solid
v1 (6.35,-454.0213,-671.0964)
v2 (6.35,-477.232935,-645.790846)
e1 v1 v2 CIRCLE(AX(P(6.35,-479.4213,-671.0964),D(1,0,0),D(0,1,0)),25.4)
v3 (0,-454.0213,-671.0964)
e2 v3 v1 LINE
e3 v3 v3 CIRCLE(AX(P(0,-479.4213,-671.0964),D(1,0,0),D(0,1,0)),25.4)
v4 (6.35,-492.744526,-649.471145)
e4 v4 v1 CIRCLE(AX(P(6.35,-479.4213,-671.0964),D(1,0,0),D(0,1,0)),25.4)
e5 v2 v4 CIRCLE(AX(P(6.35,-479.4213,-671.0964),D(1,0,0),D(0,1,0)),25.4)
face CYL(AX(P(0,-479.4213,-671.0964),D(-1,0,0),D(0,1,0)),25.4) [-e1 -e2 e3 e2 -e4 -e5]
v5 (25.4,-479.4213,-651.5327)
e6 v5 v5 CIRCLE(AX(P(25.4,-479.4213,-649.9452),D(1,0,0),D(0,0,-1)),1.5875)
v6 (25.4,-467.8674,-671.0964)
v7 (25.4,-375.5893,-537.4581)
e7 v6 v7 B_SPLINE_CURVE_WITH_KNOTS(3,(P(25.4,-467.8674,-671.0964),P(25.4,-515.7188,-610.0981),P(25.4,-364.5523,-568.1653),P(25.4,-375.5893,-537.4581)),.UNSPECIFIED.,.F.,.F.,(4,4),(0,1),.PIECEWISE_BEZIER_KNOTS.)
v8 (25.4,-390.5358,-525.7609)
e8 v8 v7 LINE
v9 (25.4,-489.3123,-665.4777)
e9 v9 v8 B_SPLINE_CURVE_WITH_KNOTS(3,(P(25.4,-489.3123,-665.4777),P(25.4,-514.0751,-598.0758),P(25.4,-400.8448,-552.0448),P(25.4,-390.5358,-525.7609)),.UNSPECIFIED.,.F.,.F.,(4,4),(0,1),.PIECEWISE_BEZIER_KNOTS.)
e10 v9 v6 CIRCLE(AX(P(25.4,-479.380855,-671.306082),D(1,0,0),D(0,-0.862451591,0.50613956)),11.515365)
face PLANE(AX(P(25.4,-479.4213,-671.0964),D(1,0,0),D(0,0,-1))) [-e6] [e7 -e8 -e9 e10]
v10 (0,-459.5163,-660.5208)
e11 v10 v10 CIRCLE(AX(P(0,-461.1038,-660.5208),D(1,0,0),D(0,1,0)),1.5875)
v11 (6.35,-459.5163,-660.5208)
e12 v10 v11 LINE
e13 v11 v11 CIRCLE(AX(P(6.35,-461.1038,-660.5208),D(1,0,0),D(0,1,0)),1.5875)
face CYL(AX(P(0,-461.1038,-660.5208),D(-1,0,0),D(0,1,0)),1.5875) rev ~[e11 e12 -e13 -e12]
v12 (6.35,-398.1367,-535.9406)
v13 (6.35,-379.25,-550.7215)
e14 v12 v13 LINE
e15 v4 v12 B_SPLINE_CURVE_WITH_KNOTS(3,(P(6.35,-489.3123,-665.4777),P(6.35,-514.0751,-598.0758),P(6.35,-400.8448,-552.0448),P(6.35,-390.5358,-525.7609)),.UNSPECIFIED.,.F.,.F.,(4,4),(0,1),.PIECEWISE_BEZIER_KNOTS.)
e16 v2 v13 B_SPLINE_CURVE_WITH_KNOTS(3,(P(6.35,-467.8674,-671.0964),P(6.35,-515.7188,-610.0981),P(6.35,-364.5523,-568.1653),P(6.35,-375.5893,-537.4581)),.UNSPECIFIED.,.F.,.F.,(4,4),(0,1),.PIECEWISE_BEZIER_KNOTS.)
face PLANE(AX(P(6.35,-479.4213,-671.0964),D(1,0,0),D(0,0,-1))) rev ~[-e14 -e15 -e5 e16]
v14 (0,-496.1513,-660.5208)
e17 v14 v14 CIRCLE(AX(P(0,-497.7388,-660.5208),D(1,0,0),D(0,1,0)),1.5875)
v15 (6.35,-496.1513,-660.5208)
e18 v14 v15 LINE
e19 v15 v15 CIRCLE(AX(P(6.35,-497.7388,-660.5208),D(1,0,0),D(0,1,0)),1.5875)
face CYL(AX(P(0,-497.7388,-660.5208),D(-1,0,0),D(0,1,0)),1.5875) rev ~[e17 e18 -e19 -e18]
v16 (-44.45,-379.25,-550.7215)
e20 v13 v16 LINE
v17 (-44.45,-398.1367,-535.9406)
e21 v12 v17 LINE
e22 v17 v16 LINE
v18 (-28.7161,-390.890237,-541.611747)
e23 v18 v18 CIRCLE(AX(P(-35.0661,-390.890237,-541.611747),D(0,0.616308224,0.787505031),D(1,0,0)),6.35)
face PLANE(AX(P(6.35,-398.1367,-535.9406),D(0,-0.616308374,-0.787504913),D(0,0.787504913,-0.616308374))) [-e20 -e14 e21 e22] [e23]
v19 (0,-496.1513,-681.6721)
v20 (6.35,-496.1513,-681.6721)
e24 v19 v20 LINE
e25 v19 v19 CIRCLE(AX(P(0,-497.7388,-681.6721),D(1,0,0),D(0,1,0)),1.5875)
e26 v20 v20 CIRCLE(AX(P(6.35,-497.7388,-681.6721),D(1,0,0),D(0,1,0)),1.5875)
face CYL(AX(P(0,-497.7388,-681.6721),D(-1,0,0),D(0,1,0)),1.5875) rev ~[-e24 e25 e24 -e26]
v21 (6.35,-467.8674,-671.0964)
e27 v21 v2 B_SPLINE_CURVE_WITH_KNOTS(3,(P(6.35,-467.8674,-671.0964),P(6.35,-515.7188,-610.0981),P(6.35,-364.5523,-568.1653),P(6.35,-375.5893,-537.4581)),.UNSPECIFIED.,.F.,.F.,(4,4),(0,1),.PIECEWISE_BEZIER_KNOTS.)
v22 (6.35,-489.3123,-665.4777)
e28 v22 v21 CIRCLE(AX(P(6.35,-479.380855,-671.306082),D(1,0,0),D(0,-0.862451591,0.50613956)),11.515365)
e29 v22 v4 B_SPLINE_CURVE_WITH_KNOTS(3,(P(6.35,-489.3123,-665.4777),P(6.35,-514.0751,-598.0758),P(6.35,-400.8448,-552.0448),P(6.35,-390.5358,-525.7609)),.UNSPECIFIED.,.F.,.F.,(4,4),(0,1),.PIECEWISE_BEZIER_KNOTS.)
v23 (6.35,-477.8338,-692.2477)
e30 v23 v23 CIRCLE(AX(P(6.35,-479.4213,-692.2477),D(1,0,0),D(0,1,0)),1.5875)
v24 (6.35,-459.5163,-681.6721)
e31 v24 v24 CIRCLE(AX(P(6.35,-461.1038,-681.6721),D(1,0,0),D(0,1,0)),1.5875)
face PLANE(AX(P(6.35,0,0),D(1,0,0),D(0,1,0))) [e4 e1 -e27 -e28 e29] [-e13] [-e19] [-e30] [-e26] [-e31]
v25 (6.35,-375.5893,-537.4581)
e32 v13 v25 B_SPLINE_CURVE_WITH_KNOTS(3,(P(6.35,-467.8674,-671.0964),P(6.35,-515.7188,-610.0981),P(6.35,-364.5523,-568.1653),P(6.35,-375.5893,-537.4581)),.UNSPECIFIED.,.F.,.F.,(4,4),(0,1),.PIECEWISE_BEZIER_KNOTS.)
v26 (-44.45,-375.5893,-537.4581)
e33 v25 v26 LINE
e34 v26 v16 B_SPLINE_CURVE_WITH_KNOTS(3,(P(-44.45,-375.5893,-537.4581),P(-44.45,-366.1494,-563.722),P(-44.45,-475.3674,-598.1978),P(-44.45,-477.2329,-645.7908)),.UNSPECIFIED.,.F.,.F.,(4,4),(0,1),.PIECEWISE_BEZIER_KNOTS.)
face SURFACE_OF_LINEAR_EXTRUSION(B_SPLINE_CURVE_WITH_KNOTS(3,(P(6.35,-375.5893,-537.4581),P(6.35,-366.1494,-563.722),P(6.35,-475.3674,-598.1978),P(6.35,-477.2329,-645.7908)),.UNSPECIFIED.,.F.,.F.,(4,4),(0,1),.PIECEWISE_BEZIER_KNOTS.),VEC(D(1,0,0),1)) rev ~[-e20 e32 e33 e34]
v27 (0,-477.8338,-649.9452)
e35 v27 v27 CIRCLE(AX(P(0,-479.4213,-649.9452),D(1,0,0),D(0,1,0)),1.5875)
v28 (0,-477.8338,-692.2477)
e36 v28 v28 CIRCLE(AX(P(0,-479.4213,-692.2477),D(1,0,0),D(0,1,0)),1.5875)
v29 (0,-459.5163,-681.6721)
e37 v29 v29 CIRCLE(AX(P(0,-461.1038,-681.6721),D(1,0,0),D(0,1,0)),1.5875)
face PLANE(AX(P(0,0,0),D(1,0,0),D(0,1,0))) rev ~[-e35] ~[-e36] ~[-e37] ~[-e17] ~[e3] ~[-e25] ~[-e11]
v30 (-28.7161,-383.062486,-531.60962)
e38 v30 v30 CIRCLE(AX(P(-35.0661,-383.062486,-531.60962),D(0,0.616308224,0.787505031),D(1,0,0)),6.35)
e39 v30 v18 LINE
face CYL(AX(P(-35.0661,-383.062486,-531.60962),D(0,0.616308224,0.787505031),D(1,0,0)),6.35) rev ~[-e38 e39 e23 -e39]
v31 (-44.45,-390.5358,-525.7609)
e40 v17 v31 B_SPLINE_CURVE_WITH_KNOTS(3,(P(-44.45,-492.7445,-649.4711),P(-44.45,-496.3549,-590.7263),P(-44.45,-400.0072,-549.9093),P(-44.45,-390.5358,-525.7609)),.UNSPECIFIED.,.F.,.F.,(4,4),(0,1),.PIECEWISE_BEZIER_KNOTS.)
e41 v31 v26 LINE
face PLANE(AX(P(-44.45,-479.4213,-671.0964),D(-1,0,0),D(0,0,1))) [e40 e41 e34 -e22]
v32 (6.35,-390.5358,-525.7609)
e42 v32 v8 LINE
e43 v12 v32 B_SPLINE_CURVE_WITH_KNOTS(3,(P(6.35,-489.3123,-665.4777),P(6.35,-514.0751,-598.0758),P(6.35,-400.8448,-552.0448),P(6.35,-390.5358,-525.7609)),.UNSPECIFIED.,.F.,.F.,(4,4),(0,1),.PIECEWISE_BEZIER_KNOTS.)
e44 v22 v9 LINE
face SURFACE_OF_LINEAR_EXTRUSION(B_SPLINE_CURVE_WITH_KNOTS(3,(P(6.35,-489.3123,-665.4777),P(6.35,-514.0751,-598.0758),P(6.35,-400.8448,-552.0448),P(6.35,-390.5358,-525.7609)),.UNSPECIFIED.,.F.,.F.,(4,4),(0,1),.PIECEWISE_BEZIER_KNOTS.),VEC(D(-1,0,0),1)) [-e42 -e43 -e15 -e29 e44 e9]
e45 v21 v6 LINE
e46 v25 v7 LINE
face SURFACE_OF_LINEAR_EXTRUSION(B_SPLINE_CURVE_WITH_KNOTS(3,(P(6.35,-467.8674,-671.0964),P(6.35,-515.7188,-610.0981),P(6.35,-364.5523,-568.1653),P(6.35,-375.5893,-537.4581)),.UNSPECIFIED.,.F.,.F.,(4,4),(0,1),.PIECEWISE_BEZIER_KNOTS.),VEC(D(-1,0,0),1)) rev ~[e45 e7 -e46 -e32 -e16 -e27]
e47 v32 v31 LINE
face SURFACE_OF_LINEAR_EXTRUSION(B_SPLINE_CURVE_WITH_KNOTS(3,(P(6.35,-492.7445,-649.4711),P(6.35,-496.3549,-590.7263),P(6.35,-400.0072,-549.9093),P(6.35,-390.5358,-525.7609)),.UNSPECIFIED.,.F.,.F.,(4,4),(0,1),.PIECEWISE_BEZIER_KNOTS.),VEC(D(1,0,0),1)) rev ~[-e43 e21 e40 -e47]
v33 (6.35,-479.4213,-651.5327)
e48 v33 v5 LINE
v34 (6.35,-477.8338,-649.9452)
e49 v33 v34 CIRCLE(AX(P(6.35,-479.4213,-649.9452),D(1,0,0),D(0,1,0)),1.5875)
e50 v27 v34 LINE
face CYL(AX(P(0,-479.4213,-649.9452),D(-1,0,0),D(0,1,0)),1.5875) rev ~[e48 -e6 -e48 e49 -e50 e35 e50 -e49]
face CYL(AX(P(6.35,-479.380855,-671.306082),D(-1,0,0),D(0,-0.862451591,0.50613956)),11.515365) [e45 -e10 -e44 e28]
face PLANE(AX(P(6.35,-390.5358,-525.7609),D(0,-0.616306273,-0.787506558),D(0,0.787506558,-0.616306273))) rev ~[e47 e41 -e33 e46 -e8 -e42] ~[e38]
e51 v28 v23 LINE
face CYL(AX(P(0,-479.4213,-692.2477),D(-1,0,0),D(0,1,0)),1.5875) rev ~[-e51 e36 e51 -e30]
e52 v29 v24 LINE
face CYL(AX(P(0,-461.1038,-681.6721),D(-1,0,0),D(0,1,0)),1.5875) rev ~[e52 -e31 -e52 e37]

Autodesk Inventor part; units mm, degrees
ref_plane "YZ Plane" through (0, 0, 0) normal (1, 0, 0) x (0, 1, 0)
ref_plane "XZ Plane" through (0, 0, 0) normal (0, 1, 0) x (-1, 0, 0)
ref_plane "XY Plane" through (0, 0, 0) normal (0, 0, 1) x (1, 0, 0)
sketch "Sketch1" plane through (0, 0, 0) normal (1, 0, 0) x (0, 1, 0)
  circle A0 centre (-479.4213, -671.0964) radius 25.4
  circle A1 centre (-479.4213, -671.0964) radius 88.9 projected
  circle A2 centre (-479.4213, -649.9452) radius 1.5875
  circle A3 centre (-497.7388, -660.5208) radius 1.5875
  circle A4 centre (-497.7388, -681.6721) radius 1.5875
  circle A5 centre (-479.4213, -692.2477) radius 1.5875
  circle A6 centre (-461.1038, -681.6721) radius 1.5875
  circle A7 centre (-461.1038, -660.5208) radius 1.5875
  point P0 (0, 0)
  dimension "d0" = 50.8
  dimension "d1" = 3.175
  dimension "d4" = 360
extrude "Extrusion1" add sketch "Sketch1" along normal blind 6.35 contours A0
sketch "Sketch2" plane through (6.35, -479.4213, -671.0964) normal (1, 0, 0) x (0, 0, -1)
  circle A0 centre (-21.1512, 0) radius 1.5875 projected
  spline S0 degree 3 poles (-5.6187, -9.891) (-73.0206, -34.6538) (-119.0516, 78.5765) (-145.3355, 88.8855) knots 0 0 0 0 1 1 1 1
  spline S1 degree 3 poles (0, 11.5539) (-60.9983, -36.2975) (-102.9311, 114.869) (-133.6383, 103.832) knots 0 0 0 0 1 1 1 1
  line L0 (-145.3355, 88.8855) -> (-133.6383, 103.832)
  arc A1 (-5.6187, -9.891) -> (0, 11.5539) centre (0.2097, 0.0404) ccw
  point P0 (-671.0964, 479.4213)
  point P1 (-69.3034, 5.0557)
  point P2 (-121.2912, 64.8414)
  point P3 (-55.007, 16.7301)
  point P4 (-109.594, 88.8855)
extrude "Extrusion2" add sketch "Sketch2" along normal blind 19.05
sketch "Sketch3" plane through (6.35, -479.4213, -671.0964) normal (-1, 0, 0) x (0, 0, 1)
  spline S0 degree 3 poles (21.6253, -13.3232) (80.3701, -16.9336) (121.1871, 79.4141) (145.3355, 88.8855) knots 0 0 0 0 1 1 1 1 projected
  line L0 (145.3355, 88.8855) -> (133.6383, 103.832) projected
  spline S1 degree 3 poles (133.6383, 103.832) (107.3744, 113.2719) (72.8986, 4.0539) (25.3056, 2.1884) knots 0 0 0 0 1 1 1 1 projected
  line L1 (135.1558, 81.2846) -> (120.3749, 100.1713)
  point P0 (671.0964, 479.4213)
extrude "Extrusion3" add sketch "Sketch3" along normal blind 50.8
sketch "Sketch4" plane through (-44.45, -375.5893, -537.4582) normal (0, 0.6163082, 0.787505) x (1, 0, 0)
  line L0 (50.8, -18.9795) -> (0, -18.9795) projected
  spline S0 degree 4 poles (22.0839, 128.199) (22.0839, 128.1731) (22.0839, 75.9092) (22.0839, -57.7492) (22.0839, -145.2754) (22.0839, -219.2952) (22.0839, -161.3853) (22.0839, -142.8391) knots 0 0 0 0 0 0.294993 0.49649 0.669634 1 1 1 1 1 projected
  spline S1 degree 4 poles (-3.3161, -142.8391) (-3.3161, -161.3853) (-3.3161, -219.2952) (-3.3161, -145.2754) (-3.3161, -57.7492) (-3.3161, 75.9092) (-3.3161, 128.1731) (-3.3161, 128.199) knots -1 -1 -1 -1 -1 -0.669634 -0.49649 -0.294993 0 0 0 0 0 projected
  line L1 (-3.3161, 128.199) -> (22.0839, 128.199) construction
  line L2 (9.3839, 128.199) -> (9.3839, -142.8391) construction
  circle A0 centre (9.3839, -9.4897) radius 6.35
  point P0 (44.45, -35.4614)
  dimension "d12" = 12.7
extrude "Extrusion4" cut sketch "Sketch4" against normal through all
properties part number "fork"
